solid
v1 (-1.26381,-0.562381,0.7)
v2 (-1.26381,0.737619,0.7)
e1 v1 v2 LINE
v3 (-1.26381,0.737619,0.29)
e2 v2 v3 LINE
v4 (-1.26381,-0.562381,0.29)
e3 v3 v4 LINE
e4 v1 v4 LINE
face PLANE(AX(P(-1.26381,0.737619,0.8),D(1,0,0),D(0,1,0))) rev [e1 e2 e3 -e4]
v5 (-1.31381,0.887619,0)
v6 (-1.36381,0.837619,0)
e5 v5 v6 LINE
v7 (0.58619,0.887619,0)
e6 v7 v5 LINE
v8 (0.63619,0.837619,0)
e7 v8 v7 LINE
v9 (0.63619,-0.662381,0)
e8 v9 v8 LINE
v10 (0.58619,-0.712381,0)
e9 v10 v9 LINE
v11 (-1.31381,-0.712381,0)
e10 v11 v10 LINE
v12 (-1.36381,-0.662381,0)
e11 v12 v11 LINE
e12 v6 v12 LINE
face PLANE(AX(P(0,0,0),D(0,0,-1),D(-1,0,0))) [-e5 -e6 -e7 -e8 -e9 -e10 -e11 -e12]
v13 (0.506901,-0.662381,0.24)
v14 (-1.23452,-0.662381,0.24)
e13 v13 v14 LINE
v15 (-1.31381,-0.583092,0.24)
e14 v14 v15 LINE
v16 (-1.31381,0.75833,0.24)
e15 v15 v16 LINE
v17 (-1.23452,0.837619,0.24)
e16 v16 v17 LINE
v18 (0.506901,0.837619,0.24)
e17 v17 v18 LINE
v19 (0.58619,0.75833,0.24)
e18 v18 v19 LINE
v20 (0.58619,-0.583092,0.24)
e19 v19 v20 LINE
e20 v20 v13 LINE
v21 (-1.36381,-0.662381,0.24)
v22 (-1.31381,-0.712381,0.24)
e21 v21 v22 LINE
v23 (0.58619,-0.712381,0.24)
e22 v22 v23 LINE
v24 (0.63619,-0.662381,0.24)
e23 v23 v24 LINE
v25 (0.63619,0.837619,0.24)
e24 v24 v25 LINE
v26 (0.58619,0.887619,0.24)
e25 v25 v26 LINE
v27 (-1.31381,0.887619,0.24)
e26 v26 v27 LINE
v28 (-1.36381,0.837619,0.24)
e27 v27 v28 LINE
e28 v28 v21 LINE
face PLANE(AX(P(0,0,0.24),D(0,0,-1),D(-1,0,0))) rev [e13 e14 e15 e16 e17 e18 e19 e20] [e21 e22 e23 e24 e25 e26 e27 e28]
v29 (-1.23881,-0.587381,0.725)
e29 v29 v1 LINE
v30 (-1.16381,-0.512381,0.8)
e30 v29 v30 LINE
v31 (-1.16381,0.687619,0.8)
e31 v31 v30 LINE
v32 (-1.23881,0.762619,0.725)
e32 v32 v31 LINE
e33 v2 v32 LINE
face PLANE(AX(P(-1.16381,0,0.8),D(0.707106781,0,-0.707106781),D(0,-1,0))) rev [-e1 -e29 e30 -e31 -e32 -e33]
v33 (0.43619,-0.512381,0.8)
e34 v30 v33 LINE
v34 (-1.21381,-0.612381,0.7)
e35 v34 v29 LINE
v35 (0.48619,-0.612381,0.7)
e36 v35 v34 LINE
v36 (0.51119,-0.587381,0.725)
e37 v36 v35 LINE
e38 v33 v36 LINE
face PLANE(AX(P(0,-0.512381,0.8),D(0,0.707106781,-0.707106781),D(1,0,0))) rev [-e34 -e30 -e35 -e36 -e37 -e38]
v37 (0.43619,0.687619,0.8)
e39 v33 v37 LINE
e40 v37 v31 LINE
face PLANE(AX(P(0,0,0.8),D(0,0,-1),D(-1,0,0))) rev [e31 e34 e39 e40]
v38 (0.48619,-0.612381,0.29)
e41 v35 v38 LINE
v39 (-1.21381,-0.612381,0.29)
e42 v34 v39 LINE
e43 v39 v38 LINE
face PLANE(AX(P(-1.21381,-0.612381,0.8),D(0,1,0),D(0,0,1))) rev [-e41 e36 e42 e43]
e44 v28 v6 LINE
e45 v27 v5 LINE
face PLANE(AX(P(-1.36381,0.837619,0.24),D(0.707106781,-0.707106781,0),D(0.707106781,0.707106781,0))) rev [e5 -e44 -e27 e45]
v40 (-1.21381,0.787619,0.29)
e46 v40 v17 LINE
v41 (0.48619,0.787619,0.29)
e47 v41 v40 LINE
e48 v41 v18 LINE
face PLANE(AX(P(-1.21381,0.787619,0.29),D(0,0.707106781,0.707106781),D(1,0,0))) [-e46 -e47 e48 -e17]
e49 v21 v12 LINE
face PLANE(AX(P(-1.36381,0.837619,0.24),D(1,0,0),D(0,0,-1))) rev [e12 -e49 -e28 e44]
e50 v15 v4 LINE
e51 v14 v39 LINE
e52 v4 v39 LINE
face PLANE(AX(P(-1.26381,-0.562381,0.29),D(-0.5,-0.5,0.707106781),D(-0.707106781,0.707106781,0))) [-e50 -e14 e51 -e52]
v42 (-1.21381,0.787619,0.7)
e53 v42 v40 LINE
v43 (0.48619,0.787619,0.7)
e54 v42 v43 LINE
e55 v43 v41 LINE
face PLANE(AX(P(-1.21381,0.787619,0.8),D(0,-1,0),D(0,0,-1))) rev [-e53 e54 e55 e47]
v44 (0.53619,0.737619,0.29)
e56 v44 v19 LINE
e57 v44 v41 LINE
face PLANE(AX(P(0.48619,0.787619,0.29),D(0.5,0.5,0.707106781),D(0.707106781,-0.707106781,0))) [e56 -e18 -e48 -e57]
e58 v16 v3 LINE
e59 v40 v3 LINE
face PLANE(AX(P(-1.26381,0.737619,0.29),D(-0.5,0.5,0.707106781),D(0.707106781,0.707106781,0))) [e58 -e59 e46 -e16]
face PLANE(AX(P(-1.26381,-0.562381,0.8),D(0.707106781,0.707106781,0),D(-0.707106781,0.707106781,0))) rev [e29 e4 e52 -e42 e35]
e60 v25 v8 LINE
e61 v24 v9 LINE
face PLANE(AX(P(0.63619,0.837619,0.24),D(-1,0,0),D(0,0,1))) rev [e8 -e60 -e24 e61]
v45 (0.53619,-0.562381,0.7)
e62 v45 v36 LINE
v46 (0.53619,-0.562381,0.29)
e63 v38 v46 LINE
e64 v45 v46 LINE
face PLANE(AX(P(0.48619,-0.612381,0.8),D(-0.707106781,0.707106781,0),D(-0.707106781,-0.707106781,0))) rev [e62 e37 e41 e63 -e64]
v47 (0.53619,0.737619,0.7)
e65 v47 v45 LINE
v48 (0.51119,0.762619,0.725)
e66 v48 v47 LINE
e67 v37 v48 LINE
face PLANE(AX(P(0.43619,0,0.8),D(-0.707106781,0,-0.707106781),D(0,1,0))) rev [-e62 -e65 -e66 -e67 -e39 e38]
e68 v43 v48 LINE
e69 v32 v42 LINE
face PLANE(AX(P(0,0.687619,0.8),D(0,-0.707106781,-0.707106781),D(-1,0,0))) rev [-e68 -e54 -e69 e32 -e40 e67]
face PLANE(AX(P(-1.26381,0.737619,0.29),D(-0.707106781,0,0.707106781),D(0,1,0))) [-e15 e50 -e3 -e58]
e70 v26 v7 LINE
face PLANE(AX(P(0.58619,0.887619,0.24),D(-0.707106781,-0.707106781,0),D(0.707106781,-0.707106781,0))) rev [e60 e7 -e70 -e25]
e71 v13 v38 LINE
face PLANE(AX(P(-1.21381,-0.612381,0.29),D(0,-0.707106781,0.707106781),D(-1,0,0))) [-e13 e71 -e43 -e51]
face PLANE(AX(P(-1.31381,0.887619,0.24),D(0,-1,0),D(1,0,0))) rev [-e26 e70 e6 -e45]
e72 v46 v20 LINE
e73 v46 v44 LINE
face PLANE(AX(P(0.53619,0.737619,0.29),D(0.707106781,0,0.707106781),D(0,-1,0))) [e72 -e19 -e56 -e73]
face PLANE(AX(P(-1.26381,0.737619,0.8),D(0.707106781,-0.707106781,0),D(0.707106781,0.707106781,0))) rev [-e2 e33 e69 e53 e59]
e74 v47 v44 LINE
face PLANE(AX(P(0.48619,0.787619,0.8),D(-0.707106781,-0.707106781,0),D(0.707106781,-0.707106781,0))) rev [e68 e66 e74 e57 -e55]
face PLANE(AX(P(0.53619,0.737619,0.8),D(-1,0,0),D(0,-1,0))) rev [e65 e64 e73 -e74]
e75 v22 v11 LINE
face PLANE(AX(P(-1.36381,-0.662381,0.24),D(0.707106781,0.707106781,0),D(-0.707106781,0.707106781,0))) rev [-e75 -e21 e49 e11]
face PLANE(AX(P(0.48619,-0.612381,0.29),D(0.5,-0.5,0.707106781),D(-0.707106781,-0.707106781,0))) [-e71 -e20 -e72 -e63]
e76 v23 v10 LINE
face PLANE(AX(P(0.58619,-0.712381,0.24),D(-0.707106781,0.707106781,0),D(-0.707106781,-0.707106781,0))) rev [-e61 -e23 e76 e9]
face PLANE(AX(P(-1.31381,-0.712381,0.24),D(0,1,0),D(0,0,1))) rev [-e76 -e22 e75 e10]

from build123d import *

# Parameters (mm, degrees)
BOSS_EXTRUDE1_DEPTH = 0.24
BOSS_EXTRUDE2_DEPTH = 0.56
CHAMFER1_SIZE       = 0.1
CHAMFER2_SIZE       = 0.05


with BuildPart() as part:
    # Sketch3 → Boss-Extrude1 (new body)
    with BuildSketch(Plane.XY):
        Polygon((-1.363809524, 0.837619048), (-1.313809524, 0.887619048), (0.586190476, 0.887619048), (0.636190476, 0.837619048), (0.636190476, -0.662380952), (0.586190476, -0.712380952), (-1.313809524, -0.712380952), (-1.363809524, -0.662380952), align=None)
    extrude(amount=BOSS_EXTRUDE1_DEPTH)

    # Sketch4 → Boss-Extrude2 (add)
    with BuildSketch(Plane.XY.offset(0.24)):
        Polygon((-1.263809524, 0.737619048), (-1.213809524, 0.787619048), (0.486190476, 0.787619048), (0.536190476, 0.737619048), (0.536190476, -0.562380952), (0.486190476, -0.612380952), (-1.213809524, -0.612380952), (-1.263809524, -0.562380952), align=None)
    extrude(amount=BOSS_EXTRUDE2_DEPTH)

    # Chamfer1
    # the kernel refuses this chamfer: 0.1 mm, written as the material it takes off along each edge
    with BuildSketch(Plane(origin=(-1.470977823, 0.787619048, 0.8), x_dir=(0, 0.027495876610586285, -0.9996219169112968), z_dir=(1, 0, 0)), Plane(origin=(0.743358775, -0.612380952, 0.8), x_dir=(0, -0.027495876610586285, -0.9996219169112968), z_dir=(-1, 0, 0))) as chamfer1_piece_1:
        Polygon((CHAMFER1_SIZE * 0.999621916911, -CHAMFER1_SIZE * 0.0274958766106), (-CHAMFER1_SIZE * 0.0274958766106, -CHAMFER1_SIZE * 0.999621916911), (0, 0), align=None)
    extrude(amount=2.214336598, mode=Mode.SUBTRACT)
    with BuildSketch(Plane(origin=(0.536190476, 0.994787346, 0.8), x_dir=(0.027495876610586285, 0, -0.9996219169112968), z_dir=(0, -1, 0)), Plane(origin=(-1.263809524, -0.819549251, 0.8), x_dir=(-0.02749587661058736, 0, -0.9996219169112966), z_dir=(0, 1, 0))) as chamfer1_piece_2:
        Polygon((CHAMFER1_SIZE * 0.999621916911, -CHAMFER1_SIZE * 0.0274958766106), (-CHAMFER1_SIZE * 0.0274958766106, -CHAMFER1_SIZE * 0.999621916911), (0, 0), align=None)
    extrude(amount=1.814336598, mode=Mode.SUBTRACT)

    # Chamfer2
    chamfer2_edges = [part.edges().sort_by_distance(p)[0] for p in [
        (-0.363809524, 0.787619048, 0.24),
        (-1.238809524, 0.762619048, 0.24),
        (-1.263809524, 0.087619048, 0.24),
        (-1.238809524, -0.587380952, 0.24),
        (-0.363809524, -0.612380952, 0.24),
        (0.511190476, -0.587380952, 0.24),
        (0.536190476, 0.087619048, 0.24),
        (0.511190476, 0.762619048, 0.24),
    ]]
    chamfer(chamfer2_edges, length=CHAMFER2_SIZE)


solid = part.part
